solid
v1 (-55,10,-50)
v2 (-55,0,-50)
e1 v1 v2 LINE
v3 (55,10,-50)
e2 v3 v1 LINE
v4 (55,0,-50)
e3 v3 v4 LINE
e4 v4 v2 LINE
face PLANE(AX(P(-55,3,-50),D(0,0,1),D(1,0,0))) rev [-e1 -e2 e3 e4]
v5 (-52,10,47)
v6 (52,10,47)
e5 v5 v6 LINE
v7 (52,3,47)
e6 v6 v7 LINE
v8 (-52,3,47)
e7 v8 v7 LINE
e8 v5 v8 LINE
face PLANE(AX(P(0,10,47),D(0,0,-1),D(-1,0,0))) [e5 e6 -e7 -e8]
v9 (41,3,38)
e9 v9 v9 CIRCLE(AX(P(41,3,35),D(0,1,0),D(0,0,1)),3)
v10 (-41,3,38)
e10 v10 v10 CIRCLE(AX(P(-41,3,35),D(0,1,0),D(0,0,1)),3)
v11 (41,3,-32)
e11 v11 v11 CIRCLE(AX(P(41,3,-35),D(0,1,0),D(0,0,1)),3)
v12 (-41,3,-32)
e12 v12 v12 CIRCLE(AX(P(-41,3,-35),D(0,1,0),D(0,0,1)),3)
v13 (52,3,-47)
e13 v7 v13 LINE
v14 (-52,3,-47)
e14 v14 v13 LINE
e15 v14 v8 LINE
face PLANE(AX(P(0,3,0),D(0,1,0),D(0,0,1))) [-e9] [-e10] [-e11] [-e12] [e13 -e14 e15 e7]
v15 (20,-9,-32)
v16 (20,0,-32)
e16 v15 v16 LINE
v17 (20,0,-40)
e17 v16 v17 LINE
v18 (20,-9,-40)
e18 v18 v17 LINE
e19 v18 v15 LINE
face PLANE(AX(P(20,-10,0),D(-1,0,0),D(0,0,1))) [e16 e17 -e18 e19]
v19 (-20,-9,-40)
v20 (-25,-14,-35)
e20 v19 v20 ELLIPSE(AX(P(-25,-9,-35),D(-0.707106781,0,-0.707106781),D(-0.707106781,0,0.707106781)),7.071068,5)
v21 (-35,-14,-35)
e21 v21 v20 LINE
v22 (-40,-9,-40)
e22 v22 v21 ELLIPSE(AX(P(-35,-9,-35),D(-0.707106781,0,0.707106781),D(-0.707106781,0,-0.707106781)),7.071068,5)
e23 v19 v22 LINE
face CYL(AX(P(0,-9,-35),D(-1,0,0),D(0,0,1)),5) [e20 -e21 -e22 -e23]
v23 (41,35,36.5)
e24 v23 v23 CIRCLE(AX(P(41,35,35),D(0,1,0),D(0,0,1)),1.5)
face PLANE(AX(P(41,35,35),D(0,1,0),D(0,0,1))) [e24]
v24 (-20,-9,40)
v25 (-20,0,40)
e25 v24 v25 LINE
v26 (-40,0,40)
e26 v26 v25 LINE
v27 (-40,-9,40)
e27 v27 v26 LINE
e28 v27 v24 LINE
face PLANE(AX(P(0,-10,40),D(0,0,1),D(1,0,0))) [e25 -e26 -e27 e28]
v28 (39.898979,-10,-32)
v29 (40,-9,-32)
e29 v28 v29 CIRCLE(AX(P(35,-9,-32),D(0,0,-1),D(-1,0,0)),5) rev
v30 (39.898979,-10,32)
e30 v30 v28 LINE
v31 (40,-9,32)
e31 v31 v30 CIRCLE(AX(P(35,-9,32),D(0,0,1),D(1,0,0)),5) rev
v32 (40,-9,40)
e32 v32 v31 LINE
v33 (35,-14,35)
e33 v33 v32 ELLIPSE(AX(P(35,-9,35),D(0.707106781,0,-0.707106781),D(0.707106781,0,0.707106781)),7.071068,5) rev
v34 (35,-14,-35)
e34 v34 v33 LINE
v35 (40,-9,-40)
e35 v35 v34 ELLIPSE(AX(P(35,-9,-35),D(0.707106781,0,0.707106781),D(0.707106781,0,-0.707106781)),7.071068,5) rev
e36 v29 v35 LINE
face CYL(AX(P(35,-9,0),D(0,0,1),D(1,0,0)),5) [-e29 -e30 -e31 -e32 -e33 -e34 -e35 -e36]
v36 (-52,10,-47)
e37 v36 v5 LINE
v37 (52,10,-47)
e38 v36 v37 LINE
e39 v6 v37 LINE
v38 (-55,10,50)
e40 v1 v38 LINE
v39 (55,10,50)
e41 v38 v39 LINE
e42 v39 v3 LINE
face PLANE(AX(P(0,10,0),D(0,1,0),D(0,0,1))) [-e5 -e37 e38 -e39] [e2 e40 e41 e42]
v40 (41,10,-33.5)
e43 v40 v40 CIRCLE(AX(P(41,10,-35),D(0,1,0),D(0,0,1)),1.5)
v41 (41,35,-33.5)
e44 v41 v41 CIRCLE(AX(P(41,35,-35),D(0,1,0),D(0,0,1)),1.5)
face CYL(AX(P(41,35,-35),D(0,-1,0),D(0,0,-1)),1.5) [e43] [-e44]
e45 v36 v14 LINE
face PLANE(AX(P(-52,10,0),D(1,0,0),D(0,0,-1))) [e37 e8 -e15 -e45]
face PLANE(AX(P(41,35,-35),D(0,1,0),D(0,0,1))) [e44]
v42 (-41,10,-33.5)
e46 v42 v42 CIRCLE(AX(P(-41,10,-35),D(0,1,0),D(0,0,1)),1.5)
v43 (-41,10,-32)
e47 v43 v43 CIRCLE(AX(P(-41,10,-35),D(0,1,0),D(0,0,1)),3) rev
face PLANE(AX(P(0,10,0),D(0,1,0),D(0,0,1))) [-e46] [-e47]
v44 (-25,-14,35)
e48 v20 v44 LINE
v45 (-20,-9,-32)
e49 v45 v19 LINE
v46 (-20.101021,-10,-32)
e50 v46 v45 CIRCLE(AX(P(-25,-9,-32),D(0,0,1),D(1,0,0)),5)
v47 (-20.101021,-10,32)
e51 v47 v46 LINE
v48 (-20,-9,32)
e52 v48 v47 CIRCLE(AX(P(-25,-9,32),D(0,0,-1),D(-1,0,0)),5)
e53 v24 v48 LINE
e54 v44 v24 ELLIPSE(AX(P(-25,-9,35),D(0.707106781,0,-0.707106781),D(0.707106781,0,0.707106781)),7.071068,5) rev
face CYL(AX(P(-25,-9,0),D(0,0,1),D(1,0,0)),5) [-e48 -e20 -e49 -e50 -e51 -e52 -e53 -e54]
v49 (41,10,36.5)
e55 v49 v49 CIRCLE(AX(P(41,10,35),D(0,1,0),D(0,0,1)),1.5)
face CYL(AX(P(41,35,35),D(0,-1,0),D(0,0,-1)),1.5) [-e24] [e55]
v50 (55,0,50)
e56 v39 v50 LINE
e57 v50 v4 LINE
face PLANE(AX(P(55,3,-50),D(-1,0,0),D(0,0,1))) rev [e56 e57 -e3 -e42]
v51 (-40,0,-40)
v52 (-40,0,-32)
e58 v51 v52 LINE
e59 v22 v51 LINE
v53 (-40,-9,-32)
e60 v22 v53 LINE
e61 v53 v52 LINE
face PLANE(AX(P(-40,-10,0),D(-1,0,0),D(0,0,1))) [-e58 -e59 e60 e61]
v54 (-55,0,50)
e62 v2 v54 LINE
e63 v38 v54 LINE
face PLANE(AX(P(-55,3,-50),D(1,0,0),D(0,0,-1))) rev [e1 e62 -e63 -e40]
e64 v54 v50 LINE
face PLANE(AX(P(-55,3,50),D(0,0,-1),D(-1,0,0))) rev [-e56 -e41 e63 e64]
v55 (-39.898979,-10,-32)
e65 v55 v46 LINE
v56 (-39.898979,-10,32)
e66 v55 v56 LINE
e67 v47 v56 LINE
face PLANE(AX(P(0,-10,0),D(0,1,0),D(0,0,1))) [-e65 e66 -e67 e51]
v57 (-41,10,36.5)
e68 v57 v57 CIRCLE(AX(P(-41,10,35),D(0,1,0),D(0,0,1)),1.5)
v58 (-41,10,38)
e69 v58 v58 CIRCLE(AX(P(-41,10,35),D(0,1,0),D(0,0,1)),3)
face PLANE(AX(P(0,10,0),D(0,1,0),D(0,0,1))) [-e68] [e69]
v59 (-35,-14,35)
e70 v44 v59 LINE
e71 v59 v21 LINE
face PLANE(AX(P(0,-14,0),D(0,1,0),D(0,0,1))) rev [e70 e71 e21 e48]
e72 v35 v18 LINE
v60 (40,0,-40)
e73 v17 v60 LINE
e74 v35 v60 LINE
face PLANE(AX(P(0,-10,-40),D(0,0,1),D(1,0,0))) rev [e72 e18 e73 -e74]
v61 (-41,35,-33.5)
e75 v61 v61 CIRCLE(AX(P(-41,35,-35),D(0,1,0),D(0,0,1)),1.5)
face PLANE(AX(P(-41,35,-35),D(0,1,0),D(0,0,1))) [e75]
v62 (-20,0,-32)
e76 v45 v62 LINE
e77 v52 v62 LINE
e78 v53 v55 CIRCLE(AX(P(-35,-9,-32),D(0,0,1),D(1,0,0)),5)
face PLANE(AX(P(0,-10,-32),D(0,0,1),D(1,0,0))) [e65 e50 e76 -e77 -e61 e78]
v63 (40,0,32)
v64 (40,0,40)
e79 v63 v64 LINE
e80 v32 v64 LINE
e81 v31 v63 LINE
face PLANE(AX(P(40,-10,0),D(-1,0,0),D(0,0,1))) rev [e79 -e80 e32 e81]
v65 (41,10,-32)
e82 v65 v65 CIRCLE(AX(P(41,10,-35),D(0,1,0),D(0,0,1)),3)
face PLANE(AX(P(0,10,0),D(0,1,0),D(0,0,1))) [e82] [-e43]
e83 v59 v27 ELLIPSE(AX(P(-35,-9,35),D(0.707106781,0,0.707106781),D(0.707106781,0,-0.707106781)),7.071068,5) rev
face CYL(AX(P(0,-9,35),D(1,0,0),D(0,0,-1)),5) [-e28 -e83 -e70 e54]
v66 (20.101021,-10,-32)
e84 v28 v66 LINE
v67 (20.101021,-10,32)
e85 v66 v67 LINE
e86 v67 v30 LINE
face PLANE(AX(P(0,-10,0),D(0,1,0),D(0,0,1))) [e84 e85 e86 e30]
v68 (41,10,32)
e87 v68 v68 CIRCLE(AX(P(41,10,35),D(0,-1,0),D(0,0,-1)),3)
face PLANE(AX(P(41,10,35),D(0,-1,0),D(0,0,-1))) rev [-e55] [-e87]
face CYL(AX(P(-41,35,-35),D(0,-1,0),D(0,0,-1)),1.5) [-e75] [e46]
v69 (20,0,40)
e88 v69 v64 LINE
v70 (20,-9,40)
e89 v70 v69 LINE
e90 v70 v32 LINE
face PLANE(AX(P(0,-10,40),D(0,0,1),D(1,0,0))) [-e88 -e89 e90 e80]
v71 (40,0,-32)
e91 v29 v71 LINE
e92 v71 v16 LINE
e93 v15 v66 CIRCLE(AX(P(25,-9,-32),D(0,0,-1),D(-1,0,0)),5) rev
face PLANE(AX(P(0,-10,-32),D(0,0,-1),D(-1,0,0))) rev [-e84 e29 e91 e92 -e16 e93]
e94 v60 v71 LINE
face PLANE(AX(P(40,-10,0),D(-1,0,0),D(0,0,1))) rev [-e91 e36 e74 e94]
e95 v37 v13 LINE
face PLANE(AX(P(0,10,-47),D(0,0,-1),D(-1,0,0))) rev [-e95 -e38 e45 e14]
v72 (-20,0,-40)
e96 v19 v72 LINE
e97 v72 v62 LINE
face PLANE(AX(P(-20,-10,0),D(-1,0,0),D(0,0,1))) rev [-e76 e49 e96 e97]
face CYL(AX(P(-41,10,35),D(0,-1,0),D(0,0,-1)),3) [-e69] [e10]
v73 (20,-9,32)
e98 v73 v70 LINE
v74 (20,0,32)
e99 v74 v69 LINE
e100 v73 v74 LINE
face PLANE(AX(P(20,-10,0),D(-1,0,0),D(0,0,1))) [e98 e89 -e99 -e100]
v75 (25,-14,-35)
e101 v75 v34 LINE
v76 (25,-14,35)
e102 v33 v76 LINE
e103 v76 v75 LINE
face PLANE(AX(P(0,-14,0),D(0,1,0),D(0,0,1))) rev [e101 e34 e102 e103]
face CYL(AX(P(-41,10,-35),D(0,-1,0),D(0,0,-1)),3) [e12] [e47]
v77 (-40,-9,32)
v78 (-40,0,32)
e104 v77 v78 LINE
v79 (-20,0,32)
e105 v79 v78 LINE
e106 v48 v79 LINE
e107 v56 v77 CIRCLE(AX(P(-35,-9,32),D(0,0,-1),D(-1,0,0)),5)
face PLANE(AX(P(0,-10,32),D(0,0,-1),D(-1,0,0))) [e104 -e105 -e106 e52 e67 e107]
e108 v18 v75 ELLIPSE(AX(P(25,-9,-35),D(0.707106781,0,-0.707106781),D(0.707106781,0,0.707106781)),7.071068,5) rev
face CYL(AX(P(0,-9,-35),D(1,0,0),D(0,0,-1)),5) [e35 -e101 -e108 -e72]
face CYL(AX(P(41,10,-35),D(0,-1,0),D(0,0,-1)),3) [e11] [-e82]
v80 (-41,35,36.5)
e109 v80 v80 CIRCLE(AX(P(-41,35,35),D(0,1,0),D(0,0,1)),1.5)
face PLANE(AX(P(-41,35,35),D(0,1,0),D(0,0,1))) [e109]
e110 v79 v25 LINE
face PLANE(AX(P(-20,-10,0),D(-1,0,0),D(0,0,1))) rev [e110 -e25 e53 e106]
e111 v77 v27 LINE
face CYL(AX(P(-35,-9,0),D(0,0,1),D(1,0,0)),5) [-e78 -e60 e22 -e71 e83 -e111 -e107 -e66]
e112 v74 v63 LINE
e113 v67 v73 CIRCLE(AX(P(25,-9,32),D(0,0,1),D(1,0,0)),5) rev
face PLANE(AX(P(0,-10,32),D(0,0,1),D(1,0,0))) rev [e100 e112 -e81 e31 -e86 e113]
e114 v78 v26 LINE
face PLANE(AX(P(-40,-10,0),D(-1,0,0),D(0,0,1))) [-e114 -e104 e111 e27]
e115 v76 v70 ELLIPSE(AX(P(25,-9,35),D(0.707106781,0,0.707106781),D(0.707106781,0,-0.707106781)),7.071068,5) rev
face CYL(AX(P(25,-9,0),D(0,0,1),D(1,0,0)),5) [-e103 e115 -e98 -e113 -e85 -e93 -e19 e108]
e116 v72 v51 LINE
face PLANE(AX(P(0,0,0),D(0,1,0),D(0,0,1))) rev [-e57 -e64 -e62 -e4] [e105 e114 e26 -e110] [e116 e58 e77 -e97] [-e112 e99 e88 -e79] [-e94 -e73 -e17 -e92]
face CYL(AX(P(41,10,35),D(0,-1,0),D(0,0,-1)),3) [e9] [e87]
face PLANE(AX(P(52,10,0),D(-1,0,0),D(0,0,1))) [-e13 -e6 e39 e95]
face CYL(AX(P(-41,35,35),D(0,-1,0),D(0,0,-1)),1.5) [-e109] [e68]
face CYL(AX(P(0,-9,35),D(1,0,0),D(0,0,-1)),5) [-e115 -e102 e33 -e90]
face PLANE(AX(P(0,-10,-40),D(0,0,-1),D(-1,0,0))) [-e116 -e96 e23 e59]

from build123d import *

# Parameters (mm, degrees)
SKETCH1_W           = 110
SKETCH1_H           = 100
BOSS_EXTRUDE1_DEPTH = 3
SKETCH2_W           = 110
SKETCH2_H           = 100
SKETCH2_W_2         = 104
SKETCH2_H_2         = 94
SKETCH2_R           = 3
BOSS_EXTRUDE2_DEPTH = 7
SKETCH3_R           = 1.5
BOSS_EXTRUDE3_DEPTH = 25
SKETCH5_W           = 20
SKETCH5_H           = 8
BOSS_EXTRUDE4_DEPTH = 10
SKETCH6_W           = 20
SKETCH6_H           = 80
BOSS_EXTRUDE5_DEPTH = 4
FILLET1_R           = 5


with BuildPart() as part:
    # Sketch1 → Boss-Extrude1 (new body)
    with BuildSketch(Plane(origin=(0, 0, 0), x_dir=(1, 0, 0), z_dir=(0, 1, 0))):
        Rectangle(SKETCH1_W, SKETCH1_H)
    extrude(amount=BOSS_EXTRUDE1_DEPTH)

    # Sketch2 → Boss-Extrude2 (add)
    # profile 1 of 5: a face of its own
    with BuildSketch(Plane(origin=(0, 3, 0), x_dir=(1, 0, 0), z_dir=(0, 1, 0))):
        Rectangle(SKETCH2_W, SKETCH2_H)
        Rectangle(SKETCH2_W_2, SKETCH2_H_2, mode=Mode.SUBTRACT)
    # profile 2 of 5: a face of its own
    with BuildSketch(Plane(origin=(0, 3, 0), x_dir=(1, 0, 0), z_dir=(0, 1, 0))):
        with Locations(Location((-41, 35, 0), (0, 0, 270))):
            Circle(SKETCH2_R)
    # profile 3 of 5: a face of its own
    with BuildSketch(Plane(origin=(0, 3, 0), x_dir=(1, 0, 0), z_dir=(0, 1, 0))):
        with Locations(Location((-41, -35, 0), (0, 0, 270))):
            Circle(SKETCH2_R)
    # profile 4 of 5: a face of its own
    with BuildSketch(Plane(origin=(0, 3, 0), x_dir=(1, 0, 0), z_dir=(0, 1, 0))):
        with Locations(Location((41, 35, 0), (0, 0, 270))):
            Circle(SKETCH2_R)
    # profile 5 of 5: a face of its own
    with BuildSketch(Plane(origin=(0, 3, 0), x_dir=(1, 0, 0), z_dir=(0, 1, 0))):
        with Locations(Location((41, -35, 0), (0, 0, 90))):
            Circle(SKETCH2_R)
    extrude(amount=BOSS_EXTRUDE2_DEPTH)

    # Sketch3 → Boss-Extrude3 (add)
    with BuildSketch(Plane(origin=(0, 10, 0), x_dir=(1, 0, 0), z_dir=(0, 1, 0))):
        with Locations(Location((-41, 35, 0), (0, 0, 270))):
            Circle(SKETCH3_R)
        with Locations(Location((41, 35, 0), (0, 0, 270))):
            Circle(SKETCH3_R)
        with Locations(Location((41, -35, 0), (0, 0, 270))):
            Circle(SKETCH3_R)
        with Locations(Location((-41, -35, 0), (0, 0, 270))):
            Circle(SKETCH3_R)
    extrude(amount=BOSS_EXTRUDE3_DEPTH)

    # Sketch5 → Boss-Extrude4 (add)
    with BuildSketch(Plane.XZ):
        with Locations((-30, -36)):
            Rectangle(SKETCH5_W, SKETCH5_H)
        with Locations((-30, 36)):
            Rectangle(SKETCH5_W, SKETCH5_H)
        with Locations((30, 36)):
            Rectangle(SKETCH5_W, SKETCH5_H)
        with Locations((30, -36)):
            Rectangle(SKETCH5_W, SKETCH5_H)
    extrude(amount=BOSS_EXTRUDE4_DEPTH)

    # Sketch6 → Boss-Extrude5 (add)
    with BuildSketch(Plane.XZ.offset(10)):
        with Locations((-30, 0)):
            Rectangle(SKETCH6_W, SKETCH6_H)
        with Locations((30, 0)):
            Rectangle(SKETCH6_W, SKETCH6_H)
    extrude(amount=BOSS_EXTRUDE5_DEPTH)

    # Fillet1
    # the kernel refuses this fillet: 5 mm, written as the material it takes off along each edge
    with BuildSketch(Plane(origin=(-40, -14, -52.5), x_dir=(1, 0, 0), z_dir=(0, 0, 1)), Plane(origin=(-20, -14, 52.5), x_dir=(-1, 0, 0), z_dir=(0, 0, -1)), Plane(origin=(20, -14, -52.5), x_dir=(1, 0, 0), z_dir=(0, 0, 1)), Plane(origin=(40, -14, 52.5), x_dir=(-1, 0, 0), z_dir=(0, 0, -1))) as fillet1_piece_1:
        with BuildLine():
            CenterArc((FILLET1_R, FILLET1_R), FILLET1_R, 180, 90)
            Line((0, FILLET1_R), (0, 0))
            Line((0, 0), (FILLET1_R, 0))
        make_face()
    extrude(amount=105, mode=Mode.SUBTRACT)
    with BuildSketch(Plane(origin=(7.5, -14, 40), x_dir=(0, 0, -1), z_dir=(1, 0, 0)), Plane(origin=(-52.5, -14, 40), x_dir=(0, 0, -1), z_dir=(1, 0, 0))) as fillet1_piece_2:
        with BuildLine():
            CenterArc((FILLET1_R, FILLET1_R), FILLET1_R, 180, 90)
            Line((0, FILLET1_R), (0, 0))
            Line((0, 0), (FILLET1_R, 0))
        make_face()
    extrude(amount=45, mode=Mode.SUBTRACT)
    with BuildSketch(Plane(origin=(52.5, -14, -40), x_dir=(0, 1, 0), z_dir=(-1, 0, 0)), Plane(origin=(-7.5, -14, -40), x_dir=(0, 1, 0), z_dir=(-1, 0, 0))) as fillet1_piece_3:
        with BuildLine():
            CenterArc((FILLET1_R, -FILLET1_R), FILLET1_R, 90, 90)
            Line((0, -FILLET1_R), (0, 0))
            Line((0, 0), (FILLET1_R, 0))
        make_face()
    extrude(amount=45, mode=Mode.SUBTRACT)


solid = part.part
